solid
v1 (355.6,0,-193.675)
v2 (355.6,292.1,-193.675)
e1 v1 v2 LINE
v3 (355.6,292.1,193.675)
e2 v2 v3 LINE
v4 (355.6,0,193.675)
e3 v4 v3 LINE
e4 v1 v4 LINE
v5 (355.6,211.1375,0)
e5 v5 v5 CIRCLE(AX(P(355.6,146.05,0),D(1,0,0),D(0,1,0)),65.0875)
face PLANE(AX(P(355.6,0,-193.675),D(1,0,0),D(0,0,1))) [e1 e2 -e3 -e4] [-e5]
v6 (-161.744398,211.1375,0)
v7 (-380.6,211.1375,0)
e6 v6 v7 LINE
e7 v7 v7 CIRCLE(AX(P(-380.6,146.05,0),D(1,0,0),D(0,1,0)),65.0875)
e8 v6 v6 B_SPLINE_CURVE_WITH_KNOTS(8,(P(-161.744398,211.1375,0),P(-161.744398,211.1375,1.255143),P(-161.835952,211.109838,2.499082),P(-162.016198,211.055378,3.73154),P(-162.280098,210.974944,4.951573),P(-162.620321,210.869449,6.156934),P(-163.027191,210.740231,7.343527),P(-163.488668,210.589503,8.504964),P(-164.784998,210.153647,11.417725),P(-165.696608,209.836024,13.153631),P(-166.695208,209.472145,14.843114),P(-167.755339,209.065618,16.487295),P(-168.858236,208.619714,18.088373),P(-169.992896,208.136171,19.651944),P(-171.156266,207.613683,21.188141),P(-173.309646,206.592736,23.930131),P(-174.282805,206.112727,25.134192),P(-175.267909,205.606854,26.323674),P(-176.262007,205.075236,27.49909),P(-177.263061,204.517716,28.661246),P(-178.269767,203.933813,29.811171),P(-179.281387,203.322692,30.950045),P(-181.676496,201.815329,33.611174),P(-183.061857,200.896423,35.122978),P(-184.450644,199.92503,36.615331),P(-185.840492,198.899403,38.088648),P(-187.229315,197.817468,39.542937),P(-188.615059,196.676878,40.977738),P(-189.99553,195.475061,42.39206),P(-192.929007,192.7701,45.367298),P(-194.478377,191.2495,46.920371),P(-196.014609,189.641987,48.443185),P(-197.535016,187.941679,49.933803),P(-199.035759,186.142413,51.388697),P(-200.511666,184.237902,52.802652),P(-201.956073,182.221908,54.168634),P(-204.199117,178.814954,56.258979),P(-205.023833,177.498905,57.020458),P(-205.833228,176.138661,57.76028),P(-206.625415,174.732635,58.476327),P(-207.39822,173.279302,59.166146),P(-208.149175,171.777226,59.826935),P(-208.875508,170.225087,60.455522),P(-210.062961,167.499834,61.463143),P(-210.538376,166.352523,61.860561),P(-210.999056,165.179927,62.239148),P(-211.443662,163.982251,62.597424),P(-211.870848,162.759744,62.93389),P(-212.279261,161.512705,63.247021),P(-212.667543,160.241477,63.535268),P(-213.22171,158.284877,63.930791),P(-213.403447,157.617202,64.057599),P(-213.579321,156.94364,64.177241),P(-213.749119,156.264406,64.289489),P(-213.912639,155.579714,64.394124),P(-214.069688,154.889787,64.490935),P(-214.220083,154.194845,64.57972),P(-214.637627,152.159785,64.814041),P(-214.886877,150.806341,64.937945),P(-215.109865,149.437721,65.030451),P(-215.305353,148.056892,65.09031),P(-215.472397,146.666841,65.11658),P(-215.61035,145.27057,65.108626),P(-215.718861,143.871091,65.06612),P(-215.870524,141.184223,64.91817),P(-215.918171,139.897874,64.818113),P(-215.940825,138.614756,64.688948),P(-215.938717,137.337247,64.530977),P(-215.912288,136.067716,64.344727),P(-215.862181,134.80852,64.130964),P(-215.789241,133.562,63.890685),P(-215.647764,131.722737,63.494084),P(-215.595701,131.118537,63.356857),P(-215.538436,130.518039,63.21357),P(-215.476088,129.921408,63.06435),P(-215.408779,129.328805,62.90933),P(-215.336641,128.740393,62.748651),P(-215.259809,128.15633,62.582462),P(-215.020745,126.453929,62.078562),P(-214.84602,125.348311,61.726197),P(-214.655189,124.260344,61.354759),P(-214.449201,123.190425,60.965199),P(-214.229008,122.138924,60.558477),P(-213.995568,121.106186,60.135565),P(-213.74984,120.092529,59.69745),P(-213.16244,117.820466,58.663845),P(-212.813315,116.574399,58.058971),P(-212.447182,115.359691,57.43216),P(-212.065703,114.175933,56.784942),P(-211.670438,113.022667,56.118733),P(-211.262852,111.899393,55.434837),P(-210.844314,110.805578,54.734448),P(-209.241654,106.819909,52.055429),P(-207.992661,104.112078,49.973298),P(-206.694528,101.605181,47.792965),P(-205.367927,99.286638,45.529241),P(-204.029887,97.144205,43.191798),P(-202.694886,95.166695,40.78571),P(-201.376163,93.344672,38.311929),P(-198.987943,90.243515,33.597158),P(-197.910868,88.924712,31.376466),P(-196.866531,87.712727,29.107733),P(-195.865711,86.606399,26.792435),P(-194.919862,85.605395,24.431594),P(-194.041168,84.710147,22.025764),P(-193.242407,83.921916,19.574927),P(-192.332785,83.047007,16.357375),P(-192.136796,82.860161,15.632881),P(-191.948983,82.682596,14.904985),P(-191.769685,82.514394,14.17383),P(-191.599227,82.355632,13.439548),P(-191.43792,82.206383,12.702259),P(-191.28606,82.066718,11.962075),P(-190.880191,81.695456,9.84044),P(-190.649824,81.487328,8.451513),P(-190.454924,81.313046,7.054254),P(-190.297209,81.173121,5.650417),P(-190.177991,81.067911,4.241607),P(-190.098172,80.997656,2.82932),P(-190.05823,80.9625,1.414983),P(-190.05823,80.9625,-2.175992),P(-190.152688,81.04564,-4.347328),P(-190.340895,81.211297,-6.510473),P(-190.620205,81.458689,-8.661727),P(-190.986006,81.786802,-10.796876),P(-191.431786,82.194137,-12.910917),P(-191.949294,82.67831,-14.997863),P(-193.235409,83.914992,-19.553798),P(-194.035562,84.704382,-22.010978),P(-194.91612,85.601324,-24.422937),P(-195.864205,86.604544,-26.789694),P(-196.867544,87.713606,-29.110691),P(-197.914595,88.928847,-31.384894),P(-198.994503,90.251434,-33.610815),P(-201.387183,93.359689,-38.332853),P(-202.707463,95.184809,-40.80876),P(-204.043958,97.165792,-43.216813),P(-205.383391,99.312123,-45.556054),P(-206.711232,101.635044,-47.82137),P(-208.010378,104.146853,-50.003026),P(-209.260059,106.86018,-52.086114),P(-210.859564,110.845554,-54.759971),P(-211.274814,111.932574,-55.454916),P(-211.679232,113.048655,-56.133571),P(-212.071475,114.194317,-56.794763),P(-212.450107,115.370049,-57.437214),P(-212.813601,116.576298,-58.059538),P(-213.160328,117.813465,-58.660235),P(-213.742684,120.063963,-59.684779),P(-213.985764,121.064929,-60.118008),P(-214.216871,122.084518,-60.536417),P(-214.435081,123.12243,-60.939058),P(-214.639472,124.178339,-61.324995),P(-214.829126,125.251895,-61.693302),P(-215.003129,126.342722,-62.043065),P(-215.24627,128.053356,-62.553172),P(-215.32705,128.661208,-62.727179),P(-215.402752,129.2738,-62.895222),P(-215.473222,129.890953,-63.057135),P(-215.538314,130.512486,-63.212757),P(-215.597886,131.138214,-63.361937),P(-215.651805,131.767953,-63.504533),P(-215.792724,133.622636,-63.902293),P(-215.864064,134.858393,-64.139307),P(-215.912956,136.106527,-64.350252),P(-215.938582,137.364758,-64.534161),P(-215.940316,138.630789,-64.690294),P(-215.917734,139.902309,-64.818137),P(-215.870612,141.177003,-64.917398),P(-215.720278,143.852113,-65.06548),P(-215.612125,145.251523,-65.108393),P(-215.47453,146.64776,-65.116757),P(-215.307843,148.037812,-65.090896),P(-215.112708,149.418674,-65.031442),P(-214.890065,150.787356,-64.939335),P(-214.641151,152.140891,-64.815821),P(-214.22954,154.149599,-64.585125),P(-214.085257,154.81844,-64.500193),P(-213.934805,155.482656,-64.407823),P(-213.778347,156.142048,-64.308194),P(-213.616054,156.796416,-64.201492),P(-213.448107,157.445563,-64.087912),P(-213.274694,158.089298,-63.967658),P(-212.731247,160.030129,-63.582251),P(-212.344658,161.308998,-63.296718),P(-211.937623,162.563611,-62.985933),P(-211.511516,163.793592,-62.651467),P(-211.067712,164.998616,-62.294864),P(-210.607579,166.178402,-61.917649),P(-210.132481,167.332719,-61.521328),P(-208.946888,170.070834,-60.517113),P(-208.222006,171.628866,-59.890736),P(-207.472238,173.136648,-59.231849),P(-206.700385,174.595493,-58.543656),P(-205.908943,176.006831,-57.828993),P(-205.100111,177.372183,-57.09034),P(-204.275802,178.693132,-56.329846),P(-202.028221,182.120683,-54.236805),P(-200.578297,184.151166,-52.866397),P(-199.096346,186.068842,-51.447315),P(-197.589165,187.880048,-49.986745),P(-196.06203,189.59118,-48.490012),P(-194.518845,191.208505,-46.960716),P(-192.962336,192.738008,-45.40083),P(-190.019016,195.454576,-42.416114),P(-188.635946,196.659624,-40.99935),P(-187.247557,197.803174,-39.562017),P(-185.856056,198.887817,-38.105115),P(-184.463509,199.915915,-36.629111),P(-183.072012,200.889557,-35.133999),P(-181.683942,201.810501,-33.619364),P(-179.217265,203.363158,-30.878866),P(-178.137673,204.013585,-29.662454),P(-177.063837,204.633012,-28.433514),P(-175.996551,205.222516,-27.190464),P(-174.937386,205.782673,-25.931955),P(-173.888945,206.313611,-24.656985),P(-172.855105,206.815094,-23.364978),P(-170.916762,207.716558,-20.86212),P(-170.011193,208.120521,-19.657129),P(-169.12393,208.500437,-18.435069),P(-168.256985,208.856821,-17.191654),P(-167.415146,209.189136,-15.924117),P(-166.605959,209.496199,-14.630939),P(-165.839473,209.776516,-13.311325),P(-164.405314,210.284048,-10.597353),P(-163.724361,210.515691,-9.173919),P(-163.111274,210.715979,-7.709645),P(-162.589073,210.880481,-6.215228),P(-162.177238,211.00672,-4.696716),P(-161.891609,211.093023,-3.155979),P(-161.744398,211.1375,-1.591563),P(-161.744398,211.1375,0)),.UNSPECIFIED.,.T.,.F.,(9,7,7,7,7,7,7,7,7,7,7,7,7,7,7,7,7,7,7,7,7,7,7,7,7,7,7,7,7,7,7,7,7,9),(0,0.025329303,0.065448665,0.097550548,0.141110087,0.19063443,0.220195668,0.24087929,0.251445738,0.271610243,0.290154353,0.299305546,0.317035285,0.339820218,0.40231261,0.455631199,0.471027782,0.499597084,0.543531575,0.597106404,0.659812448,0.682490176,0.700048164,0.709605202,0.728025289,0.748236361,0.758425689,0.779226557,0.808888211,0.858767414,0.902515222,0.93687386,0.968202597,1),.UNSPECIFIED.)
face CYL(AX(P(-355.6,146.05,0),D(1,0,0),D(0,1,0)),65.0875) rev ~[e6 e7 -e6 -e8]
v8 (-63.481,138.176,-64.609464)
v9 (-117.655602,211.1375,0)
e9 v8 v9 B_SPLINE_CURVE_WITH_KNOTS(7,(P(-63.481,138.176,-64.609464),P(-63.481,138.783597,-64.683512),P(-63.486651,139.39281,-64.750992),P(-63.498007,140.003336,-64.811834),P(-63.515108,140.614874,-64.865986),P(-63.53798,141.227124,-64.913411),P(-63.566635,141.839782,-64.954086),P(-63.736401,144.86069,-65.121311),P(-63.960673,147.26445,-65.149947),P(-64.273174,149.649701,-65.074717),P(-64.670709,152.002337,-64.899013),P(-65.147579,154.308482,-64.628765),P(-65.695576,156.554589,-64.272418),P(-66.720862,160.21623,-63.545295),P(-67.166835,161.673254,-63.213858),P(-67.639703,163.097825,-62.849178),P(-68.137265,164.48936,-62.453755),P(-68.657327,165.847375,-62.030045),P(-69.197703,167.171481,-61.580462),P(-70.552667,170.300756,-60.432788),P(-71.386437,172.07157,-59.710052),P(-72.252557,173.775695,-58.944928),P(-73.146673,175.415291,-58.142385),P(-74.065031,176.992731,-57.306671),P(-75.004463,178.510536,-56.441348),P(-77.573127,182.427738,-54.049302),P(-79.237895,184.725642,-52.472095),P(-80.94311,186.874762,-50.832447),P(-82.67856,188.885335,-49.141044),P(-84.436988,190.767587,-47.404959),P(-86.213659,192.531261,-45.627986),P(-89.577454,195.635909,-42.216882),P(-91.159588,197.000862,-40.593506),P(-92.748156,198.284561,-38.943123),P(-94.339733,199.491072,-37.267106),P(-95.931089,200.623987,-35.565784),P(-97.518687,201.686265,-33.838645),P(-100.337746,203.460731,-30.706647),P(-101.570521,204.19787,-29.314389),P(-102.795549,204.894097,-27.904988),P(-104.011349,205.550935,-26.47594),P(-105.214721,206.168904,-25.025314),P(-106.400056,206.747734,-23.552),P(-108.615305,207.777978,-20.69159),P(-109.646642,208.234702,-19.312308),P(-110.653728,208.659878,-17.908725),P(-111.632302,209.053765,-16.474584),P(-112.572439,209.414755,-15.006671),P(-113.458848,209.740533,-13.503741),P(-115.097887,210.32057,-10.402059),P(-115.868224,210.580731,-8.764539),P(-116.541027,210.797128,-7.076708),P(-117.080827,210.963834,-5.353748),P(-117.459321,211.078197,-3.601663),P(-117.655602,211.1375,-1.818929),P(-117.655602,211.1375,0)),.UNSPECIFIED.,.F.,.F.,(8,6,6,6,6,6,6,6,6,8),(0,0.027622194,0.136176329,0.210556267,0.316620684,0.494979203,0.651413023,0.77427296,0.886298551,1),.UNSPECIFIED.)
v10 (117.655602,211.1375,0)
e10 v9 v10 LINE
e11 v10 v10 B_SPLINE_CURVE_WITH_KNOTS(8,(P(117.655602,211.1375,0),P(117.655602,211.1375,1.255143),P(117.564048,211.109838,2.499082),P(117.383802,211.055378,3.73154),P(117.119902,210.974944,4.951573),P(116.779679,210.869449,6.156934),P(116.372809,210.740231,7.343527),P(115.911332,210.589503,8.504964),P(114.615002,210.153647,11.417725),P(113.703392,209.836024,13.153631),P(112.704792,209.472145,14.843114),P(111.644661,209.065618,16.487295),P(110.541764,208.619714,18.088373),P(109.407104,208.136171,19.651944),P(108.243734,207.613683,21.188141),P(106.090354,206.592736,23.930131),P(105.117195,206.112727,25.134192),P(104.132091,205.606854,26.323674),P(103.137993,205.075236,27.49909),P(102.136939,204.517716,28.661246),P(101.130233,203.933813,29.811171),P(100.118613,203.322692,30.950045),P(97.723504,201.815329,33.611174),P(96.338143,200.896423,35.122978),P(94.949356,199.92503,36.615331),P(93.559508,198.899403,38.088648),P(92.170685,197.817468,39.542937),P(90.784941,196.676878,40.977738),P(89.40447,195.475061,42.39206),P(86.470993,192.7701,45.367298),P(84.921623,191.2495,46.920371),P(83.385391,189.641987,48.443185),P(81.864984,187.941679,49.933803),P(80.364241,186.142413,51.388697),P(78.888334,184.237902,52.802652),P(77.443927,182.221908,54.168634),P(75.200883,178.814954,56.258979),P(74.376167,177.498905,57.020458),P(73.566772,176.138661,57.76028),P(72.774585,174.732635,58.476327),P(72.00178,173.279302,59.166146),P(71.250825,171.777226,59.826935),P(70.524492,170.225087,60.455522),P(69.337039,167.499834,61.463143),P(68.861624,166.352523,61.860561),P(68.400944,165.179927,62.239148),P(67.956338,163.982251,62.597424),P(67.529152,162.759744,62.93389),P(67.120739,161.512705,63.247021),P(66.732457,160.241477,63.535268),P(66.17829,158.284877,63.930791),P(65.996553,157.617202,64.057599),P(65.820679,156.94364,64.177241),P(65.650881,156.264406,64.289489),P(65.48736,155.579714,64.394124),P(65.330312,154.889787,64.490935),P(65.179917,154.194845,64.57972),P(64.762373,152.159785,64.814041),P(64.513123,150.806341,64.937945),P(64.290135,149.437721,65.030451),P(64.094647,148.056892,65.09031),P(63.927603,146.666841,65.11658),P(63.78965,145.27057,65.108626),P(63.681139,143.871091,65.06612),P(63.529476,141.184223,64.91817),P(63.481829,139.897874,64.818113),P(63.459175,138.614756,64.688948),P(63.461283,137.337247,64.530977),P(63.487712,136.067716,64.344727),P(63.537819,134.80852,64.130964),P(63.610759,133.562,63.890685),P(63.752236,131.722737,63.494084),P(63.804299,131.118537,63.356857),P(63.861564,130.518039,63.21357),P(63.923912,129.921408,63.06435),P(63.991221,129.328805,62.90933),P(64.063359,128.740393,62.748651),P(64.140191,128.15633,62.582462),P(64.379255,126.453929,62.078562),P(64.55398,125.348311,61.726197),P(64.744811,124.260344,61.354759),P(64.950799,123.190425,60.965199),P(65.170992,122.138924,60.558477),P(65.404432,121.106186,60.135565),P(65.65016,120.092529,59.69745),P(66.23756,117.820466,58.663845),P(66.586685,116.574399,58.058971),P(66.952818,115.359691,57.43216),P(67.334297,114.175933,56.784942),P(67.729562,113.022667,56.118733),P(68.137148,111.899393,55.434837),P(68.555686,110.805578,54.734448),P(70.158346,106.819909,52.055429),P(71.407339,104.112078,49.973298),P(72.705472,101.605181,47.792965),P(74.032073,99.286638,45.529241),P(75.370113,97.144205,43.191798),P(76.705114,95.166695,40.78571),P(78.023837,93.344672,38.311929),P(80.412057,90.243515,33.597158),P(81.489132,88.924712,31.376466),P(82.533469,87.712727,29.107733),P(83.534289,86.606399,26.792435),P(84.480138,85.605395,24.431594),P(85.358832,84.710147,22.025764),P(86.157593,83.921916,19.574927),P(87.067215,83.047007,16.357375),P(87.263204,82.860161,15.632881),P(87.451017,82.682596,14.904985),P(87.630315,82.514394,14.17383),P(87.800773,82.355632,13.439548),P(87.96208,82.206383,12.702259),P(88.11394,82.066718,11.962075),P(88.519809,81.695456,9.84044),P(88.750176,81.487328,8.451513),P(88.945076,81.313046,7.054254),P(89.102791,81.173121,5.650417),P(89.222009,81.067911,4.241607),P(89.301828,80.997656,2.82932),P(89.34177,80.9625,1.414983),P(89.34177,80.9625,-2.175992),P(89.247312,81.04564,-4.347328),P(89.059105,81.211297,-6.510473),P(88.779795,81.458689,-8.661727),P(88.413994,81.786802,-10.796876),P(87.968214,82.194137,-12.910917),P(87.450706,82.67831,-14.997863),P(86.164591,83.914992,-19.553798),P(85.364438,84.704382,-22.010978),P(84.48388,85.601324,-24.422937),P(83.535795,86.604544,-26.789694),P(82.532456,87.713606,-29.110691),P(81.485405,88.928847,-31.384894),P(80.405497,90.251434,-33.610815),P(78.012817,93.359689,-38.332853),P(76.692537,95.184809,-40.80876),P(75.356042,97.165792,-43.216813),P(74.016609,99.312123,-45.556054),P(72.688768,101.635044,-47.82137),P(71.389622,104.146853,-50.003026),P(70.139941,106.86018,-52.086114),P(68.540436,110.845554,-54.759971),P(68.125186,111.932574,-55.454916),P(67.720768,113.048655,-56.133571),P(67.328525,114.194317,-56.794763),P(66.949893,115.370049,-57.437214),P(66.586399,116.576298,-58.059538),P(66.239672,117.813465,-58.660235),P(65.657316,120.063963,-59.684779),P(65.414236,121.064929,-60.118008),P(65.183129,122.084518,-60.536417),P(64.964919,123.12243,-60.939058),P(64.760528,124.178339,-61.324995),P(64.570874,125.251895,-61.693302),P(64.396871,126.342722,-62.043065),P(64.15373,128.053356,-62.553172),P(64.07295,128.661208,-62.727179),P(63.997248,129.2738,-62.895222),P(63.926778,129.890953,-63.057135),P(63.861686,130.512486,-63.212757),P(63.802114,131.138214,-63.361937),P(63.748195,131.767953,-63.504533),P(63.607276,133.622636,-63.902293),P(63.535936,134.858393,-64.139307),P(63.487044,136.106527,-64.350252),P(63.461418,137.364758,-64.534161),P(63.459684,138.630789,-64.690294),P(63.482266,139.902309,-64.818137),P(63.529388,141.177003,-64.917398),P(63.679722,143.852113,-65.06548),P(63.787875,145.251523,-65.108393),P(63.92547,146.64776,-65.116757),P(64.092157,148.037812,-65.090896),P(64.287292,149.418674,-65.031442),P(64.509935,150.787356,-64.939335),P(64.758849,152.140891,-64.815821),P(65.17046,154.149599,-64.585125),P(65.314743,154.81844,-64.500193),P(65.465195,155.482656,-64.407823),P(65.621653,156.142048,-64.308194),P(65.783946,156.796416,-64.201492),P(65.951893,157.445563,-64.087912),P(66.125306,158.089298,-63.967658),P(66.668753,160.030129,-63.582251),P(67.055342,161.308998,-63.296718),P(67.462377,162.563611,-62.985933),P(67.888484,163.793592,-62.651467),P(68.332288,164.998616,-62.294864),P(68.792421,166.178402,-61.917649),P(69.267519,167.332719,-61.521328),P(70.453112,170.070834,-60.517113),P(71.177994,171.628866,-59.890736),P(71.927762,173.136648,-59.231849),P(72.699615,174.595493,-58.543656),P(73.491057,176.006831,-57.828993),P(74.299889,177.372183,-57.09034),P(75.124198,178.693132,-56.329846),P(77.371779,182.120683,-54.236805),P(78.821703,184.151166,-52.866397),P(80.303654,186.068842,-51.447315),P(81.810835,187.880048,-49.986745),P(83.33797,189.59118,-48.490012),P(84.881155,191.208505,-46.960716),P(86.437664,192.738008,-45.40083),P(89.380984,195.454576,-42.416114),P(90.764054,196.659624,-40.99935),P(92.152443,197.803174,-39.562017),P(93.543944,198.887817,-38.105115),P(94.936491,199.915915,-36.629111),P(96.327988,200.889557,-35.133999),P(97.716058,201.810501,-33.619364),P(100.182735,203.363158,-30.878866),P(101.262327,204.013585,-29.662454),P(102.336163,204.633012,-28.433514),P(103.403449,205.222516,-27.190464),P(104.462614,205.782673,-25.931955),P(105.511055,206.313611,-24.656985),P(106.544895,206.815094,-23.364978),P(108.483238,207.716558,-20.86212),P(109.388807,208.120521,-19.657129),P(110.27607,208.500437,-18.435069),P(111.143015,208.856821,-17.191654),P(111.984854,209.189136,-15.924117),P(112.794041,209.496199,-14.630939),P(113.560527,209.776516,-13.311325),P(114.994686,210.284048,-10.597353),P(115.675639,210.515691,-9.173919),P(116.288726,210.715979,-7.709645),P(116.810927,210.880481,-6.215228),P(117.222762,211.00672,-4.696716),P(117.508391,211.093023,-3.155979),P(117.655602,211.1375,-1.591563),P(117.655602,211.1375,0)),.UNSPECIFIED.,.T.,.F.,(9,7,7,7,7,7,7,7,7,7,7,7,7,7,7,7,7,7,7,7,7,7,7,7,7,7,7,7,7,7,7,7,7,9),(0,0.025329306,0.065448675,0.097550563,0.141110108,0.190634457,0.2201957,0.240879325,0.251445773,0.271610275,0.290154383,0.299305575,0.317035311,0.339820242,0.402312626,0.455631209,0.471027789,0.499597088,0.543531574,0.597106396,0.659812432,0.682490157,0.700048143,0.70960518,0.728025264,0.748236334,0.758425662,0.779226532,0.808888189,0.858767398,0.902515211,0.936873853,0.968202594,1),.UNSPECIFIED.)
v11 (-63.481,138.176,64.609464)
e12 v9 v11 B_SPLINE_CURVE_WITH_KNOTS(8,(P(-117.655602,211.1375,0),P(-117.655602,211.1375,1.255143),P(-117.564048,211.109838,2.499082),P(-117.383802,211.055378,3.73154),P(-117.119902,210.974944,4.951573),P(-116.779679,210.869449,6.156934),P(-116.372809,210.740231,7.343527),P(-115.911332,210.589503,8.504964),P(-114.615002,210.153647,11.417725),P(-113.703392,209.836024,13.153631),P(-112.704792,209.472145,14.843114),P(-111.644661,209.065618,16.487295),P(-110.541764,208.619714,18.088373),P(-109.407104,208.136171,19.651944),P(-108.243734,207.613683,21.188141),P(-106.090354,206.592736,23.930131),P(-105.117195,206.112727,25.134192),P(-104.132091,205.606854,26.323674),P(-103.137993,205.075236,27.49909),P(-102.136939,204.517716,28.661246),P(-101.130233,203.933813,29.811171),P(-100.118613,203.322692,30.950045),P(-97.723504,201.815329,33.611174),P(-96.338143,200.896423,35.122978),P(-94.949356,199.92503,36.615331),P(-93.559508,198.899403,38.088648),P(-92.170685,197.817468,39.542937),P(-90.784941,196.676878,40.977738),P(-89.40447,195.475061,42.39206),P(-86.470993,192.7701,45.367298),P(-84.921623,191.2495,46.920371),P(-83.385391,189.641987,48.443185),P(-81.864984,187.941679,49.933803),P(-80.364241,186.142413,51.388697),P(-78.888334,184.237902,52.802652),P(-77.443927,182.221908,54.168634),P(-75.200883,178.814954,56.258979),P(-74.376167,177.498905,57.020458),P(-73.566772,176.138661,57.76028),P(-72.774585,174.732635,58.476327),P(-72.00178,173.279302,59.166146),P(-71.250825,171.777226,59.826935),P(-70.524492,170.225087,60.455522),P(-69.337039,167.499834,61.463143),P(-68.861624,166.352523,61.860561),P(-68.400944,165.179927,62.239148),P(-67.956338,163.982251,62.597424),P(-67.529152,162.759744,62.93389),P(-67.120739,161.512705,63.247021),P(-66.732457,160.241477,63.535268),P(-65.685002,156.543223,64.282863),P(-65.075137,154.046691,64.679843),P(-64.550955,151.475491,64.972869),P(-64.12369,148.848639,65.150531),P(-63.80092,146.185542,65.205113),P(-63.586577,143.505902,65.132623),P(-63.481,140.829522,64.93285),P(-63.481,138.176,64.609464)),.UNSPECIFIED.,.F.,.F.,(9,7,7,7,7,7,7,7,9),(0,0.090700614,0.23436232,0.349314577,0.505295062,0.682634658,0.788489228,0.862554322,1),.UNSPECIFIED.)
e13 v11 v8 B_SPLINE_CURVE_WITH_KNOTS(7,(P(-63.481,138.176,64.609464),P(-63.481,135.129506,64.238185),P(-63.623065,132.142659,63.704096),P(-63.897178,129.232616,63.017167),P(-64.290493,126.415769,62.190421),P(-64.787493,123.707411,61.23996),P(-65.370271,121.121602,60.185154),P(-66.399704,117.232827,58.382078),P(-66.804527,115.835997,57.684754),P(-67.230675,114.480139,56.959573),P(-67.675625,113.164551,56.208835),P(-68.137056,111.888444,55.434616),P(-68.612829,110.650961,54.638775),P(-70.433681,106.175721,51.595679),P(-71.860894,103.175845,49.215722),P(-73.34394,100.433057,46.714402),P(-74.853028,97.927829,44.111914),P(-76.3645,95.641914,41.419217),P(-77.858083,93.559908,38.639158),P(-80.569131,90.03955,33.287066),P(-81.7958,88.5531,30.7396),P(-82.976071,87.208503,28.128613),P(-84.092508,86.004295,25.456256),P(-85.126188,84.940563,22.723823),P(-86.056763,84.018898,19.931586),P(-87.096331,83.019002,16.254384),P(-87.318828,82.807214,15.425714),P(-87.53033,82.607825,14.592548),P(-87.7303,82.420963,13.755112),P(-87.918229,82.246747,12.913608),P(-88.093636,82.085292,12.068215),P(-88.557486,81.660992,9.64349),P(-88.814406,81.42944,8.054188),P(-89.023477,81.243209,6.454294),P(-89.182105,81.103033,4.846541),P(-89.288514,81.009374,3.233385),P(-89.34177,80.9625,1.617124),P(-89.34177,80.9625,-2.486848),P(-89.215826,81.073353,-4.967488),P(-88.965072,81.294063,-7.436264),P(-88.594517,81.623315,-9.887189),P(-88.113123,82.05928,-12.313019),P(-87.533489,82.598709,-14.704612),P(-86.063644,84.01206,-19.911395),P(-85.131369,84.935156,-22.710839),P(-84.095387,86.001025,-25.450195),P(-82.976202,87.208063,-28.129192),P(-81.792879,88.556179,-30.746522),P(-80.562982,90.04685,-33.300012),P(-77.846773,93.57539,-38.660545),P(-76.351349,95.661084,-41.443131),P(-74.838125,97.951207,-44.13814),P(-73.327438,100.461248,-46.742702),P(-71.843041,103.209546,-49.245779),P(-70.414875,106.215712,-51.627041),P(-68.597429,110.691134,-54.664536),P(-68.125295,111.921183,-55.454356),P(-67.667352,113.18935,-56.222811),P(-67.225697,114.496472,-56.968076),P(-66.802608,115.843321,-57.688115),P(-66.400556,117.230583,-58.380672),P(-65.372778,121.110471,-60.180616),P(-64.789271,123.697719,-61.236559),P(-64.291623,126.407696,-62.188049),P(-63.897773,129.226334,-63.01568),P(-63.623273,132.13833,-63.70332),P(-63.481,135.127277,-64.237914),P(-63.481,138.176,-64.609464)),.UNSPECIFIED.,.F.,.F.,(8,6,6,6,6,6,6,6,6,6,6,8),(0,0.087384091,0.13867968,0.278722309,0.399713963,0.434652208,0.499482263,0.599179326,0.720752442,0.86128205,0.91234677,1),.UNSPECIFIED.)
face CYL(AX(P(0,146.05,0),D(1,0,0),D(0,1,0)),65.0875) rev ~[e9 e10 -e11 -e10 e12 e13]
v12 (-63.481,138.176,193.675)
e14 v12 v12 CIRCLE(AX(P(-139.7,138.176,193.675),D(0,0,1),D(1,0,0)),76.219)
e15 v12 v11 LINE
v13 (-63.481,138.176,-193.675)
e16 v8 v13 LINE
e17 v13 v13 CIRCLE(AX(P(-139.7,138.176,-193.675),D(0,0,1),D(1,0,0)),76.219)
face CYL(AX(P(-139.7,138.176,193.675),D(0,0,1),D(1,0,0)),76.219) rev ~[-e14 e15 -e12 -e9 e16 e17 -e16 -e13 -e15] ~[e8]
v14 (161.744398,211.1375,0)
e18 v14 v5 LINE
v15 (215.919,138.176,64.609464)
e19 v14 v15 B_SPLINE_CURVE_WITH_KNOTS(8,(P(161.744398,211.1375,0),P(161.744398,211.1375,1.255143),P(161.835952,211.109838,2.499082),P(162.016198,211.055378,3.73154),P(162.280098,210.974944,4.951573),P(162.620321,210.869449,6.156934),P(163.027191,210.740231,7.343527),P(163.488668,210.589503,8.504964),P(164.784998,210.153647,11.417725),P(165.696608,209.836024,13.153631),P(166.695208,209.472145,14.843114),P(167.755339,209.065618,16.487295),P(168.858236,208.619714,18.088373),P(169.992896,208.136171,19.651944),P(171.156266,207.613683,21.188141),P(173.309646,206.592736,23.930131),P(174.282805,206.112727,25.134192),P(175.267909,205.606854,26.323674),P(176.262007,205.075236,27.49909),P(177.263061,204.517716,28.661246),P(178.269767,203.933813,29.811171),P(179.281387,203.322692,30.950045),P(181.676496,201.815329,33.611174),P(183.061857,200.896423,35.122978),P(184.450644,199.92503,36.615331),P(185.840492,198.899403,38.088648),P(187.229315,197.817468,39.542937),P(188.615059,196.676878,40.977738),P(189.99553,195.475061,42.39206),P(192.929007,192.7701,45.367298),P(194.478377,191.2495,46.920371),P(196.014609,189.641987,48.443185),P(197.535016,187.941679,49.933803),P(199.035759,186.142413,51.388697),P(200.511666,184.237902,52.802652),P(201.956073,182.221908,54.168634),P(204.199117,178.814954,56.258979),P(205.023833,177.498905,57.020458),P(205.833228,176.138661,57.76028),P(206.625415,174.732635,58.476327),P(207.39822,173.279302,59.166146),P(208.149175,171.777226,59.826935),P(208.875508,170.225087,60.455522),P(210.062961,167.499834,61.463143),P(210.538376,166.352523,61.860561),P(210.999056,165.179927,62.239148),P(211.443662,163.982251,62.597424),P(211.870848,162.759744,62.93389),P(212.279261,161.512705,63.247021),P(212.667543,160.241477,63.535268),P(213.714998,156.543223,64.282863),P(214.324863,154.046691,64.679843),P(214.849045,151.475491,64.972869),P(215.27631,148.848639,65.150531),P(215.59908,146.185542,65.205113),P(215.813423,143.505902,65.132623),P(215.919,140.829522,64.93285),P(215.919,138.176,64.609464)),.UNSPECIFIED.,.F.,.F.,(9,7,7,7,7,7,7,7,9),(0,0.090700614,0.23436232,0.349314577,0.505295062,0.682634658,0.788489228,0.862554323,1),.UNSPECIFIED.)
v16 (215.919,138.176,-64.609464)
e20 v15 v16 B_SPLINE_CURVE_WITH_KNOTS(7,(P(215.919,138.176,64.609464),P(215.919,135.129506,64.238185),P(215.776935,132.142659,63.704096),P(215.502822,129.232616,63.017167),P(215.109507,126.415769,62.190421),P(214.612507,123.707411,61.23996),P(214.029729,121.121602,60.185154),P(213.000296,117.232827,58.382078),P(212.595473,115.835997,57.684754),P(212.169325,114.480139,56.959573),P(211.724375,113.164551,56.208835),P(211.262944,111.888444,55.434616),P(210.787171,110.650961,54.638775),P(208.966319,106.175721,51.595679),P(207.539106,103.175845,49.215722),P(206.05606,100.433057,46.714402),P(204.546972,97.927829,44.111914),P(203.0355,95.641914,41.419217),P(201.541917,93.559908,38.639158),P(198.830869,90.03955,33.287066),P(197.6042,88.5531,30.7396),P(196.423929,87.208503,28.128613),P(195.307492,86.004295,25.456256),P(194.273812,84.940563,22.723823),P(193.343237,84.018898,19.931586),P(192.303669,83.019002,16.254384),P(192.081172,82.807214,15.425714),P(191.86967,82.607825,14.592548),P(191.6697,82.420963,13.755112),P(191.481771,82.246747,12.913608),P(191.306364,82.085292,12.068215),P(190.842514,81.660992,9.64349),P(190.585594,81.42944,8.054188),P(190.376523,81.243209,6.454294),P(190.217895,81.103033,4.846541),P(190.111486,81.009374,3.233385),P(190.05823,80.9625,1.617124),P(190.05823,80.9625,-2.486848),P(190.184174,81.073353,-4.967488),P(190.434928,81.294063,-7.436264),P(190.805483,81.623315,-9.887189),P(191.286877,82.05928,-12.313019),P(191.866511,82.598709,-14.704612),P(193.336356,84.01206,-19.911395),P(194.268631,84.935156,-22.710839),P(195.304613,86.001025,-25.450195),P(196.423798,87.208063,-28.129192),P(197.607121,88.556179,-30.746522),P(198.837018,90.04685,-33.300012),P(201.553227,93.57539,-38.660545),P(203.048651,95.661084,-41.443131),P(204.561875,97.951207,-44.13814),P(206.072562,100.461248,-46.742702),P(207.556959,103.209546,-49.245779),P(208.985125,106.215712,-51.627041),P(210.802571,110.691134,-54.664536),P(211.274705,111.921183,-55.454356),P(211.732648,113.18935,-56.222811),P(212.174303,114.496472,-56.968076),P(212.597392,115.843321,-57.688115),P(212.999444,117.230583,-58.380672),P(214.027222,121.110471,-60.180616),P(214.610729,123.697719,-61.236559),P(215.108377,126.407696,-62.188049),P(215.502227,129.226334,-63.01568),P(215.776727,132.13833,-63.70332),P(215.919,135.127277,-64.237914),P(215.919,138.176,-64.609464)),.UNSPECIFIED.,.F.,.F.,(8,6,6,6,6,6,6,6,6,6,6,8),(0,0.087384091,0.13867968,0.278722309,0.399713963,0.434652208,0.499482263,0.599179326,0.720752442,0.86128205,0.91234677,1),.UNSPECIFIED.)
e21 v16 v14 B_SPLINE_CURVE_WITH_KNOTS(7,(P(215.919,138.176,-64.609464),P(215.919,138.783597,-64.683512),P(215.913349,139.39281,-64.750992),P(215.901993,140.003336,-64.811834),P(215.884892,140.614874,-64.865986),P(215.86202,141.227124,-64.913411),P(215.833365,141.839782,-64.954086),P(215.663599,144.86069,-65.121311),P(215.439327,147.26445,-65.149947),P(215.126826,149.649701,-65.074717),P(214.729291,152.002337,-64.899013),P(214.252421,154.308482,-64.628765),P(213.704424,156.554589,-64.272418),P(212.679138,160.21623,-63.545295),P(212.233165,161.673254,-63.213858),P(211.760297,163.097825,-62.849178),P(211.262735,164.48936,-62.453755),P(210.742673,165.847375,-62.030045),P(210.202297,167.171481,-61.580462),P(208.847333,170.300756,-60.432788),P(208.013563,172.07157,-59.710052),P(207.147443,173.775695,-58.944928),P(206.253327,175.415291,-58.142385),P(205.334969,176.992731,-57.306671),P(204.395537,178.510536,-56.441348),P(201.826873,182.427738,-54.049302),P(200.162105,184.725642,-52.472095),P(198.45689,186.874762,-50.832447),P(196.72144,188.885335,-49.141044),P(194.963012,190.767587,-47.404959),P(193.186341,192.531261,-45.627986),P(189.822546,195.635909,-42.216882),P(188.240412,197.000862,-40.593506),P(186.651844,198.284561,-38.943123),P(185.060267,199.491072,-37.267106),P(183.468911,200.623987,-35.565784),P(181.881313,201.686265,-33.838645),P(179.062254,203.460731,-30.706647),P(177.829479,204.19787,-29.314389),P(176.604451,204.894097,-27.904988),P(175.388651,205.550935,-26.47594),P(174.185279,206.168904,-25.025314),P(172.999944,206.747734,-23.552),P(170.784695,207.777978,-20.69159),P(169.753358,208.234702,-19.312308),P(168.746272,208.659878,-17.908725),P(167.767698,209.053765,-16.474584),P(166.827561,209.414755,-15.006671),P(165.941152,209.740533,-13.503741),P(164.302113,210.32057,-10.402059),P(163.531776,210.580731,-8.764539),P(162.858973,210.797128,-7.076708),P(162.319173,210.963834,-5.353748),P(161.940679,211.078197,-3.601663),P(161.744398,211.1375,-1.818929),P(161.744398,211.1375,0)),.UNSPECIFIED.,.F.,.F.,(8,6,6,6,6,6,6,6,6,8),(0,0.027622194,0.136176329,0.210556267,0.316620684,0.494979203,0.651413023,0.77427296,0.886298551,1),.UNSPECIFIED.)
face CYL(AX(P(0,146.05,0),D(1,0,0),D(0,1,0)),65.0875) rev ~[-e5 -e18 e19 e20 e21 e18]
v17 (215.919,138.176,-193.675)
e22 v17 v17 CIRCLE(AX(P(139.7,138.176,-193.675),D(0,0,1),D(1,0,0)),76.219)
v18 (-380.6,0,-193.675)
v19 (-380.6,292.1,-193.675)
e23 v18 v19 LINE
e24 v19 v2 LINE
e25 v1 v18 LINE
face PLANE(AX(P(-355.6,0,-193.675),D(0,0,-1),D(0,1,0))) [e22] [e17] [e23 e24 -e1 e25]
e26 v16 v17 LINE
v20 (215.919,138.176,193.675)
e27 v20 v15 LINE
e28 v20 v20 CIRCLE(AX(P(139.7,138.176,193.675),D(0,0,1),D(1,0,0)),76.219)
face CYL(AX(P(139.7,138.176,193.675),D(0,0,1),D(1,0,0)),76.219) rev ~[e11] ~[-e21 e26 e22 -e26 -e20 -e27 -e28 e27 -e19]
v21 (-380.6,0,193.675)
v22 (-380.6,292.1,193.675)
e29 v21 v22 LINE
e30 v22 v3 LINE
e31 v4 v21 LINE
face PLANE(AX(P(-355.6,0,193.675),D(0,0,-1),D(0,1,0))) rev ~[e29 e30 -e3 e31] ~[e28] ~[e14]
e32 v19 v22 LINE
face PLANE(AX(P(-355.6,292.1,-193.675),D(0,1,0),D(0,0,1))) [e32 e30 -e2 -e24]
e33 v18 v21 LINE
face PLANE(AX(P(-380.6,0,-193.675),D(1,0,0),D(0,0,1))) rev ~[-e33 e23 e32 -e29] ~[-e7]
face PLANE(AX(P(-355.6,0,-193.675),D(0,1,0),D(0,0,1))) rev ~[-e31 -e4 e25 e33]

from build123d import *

# Parameters (mm, degrees)
F0_W     = 711.2
F0_H     = 387.35
F1_DEPTH = 292.1
F2_R     = 65.0875
F3_DEPTH = 375
F4_R     = 76.219
F5_DEPTH = 388
F7_DEPTH = 25


with BuildPart() as f1:
    # F0 (on Front) → F1 (new body)
    with BuildSketch(Plane.XZ):
        Rectangle(F0_W, F0_H)
    extrude(amount=-F1_DEPTH)

    # F2 (on Right) → F3 (cut, symmetric)
    with BuildSketch(Plane.YZ):
        with Locations((146.05, 0)):
            Circle(F2_R)
    extrude(amount=F3_DEPTH, both=True, mode=Mode.SUBTRACT)

    # F4 (on face) → F5 (cut)
    with BuildSketch(Plane.XY.offset(193.675)):
        with Locations((139.7, 138.176)):
            Circle(F4_R)
        with Locations((-139.7, 138.176)):
            Circle(F4_R)
    extrude(amount=-F5_DEPTH, mode=Mode.SUBTRACT)

    # F7 (add): a face of the model
    f7_faces = [f1.faces().sort_by_distance(p)[0] for p in [
        (-355.6, 146.05, 188.823583377),
    ]]
    extrude(f7_faces, amount=F7_DEPTH)


solid = f1.part
